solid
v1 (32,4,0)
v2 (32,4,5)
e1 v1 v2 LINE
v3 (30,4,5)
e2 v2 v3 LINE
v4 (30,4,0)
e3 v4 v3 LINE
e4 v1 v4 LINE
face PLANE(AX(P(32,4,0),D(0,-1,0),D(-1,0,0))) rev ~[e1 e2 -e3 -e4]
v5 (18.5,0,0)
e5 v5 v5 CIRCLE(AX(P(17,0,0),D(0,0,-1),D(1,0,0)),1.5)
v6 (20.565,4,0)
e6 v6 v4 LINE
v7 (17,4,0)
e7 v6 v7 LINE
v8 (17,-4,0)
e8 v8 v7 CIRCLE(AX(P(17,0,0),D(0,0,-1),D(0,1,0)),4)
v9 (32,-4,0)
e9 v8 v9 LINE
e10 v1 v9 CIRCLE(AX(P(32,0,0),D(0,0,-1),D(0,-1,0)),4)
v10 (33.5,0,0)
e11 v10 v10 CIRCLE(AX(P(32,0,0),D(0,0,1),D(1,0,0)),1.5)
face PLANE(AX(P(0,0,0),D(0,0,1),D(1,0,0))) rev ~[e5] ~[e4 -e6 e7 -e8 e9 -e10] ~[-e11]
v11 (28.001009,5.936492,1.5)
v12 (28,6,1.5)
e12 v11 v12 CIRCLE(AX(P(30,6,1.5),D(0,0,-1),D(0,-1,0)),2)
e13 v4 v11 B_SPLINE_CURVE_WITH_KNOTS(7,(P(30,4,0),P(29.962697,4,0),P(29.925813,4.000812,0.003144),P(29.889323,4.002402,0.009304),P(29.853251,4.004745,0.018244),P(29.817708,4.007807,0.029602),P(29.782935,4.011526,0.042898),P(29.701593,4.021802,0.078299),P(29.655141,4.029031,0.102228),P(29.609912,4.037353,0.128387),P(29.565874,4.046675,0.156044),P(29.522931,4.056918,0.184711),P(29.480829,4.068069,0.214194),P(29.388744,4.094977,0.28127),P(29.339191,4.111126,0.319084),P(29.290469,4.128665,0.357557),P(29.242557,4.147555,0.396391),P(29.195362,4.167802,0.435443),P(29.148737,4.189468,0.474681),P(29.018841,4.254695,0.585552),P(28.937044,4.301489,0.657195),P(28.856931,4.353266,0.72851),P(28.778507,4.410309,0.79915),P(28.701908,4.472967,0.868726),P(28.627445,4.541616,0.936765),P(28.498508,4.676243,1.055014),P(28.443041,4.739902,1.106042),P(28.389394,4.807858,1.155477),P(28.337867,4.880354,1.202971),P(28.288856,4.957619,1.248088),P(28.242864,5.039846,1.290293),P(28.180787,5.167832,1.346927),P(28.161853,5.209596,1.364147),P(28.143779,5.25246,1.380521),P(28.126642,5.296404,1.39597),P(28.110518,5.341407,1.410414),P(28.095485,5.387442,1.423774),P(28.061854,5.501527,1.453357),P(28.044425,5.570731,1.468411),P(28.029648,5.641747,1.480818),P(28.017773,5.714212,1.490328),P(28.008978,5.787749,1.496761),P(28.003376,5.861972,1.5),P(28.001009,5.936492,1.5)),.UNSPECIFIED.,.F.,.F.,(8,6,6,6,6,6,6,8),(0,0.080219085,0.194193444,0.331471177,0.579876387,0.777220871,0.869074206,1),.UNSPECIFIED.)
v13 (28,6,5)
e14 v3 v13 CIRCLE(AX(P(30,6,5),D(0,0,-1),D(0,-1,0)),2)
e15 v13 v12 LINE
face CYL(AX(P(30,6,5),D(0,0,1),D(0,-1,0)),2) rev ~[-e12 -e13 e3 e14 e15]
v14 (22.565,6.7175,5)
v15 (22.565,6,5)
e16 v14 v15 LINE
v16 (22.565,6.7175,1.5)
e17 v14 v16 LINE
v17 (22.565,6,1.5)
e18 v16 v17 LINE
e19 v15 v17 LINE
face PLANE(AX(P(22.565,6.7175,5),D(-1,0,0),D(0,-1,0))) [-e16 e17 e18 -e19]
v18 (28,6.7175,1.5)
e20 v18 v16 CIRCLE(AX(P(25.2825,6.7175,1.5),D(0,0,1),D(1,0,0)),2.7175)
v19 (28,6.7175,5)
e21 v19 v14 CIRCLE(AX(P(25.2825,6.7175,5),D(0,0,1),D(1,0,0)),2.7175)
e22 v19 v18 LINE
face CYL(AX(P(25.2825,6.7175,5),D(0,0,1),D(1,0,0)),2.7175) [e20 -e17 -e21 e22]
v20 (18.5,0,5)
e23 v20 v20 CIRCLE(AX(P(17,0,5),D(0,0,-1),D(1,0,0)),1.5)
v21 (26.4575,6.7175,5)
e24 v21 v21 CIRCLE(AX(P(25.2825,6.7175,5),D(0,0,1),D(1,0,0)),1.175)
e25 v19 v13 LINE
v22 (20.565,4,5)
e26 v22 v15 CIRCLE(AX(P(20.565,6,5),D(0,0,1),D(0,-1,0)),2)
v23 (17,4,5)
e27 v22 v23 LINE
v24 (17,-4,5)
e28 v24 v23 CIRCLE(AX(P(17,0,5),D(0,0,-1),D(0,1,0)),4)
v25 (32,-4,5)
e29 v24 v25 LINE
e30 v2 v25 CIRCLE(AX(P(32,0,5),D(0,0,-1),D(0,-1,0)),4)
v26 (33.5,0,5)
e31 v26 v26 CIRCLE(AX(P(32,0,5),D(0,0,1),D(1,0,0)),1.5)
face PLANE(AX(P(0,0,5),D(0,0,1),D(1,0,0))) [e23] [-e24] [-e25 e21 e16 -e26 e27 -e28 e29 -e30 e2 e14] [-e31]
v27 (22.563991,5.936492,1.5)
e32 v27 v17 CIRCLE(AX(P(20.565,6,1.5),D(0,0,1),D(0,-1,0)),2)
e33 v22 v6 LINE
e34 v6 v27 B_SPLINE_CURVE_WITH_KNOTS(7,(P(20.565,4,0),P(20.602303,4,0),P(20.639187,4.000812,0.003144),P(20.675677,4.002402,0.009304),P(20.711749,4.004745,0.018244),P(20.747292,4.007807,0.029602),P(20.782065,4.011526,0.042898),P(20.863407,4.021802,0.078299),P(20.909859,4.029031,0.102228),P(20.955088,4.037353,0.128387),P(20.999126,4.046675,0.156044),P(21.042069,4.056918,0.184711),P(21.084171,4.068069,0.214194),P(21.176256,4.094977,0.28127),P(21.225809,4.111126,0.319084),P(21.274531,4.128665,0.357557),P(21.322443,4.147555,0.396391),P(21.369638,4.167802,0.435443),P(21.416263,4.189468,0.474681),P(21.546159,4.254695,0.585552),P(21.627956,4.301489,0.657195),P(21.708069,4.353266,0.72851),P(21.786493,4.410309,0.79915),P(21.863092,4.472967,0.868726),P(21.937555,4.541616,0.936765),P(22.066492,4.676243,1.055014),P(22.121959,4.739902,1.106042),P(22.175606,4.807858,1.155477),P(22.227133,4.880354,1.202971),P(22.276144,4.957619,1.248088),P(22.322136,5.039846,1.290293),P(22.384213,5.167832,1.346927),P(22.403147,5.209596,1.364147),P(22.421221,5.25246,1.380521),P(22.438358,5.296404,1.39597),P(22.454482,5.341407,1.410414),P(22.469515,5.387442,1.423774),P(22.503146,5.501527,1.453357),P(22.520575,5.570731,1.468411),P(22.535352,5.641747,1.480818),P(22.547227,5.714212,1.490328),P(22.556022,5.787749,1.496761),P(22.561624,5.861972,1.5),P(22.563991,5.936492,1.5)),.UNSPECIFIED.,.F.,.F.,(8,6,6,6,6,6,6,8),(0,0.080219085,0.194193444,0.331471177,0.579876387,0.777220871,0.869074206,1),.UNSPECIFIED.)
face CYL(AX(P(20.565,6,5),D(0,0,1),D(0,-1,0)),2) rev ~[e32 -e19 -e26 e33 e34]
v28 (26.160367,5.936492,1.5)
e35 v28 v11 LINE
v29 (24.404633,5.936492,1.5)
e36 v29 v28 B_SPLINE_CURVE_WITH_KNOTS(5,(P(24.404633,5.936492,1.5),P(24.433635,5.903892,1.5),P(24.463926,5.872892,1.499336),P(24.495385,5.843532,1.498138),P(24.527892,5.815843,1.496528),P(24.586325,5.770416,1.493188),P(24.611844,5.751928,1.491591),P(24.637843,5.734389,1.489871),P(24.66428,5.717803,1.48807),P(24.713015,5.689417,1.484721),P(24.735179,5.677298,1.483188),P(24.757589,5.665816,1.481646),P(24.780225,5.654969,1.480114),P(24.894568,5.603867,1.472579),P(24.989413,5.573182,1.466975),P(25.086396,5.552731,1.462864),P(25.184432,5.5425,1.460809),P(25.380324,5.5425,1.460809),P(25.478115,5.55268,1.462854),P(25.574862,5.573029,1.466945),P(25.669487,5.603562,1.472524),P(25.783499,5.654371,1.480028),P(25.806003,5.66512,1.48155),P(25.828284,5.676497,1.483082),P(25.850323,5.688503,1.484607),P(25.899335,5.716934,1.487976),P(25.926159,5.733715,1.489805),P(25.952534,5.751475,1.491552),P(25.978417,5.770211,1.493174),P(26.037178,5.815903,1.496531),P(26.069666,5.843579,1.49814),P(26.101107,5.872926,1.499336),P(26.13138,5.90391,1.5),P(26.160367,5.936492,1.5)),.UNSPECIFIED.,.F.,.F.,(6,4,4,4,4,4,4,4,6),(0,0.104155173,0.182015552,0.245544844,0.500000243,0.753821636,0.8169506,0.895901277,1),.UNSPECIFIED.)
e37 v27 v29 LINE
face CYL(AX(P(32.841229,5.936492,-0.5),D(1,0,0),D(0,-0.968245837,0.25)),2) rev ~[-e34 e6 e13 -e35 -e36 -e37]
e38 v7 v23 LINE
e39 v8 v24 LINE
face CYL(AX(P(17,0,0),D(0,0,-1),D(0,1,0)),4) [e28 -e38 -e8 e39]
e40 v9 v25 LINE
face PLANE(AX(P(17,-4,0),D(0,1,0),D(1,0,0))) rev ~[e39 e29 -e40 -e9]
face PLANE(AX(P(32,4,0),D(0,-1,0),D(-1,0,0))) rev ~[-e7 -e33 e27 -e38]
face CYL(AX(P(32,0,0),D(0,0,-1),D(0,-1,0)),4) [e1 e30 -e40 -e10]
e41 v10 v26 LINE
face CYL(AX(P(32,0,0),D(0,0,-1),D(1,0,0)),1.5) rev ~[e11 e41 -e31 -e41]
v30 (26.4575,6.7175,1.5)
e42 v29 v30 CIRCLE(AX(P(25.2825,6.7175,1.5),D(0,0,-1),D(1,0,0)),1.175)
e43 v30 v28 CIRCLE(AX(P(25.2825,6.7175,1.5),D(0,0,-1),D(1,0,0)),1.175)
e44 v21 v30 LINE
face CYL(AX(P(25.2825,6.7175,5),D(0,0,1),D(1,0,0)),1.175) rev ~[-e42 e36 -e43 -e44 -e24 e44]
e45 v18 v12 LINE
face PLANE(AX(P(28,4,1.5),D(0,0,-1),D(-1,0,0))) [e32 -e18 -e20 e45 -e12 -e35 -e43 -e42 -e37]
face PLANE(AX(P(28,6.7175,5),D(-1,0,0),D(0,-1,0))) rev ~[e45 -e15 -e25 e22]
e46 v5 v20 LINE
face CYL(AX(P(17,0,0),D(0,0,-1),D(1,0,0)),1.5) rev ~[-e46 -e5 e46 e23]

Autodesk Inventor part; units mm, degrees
ref_plane "YZ Plane" through (0, 0, 0) normal (1, 0, 0) x (0, 1, 0)
ref_plane "XZ Plane" through (0, 0, 0) normal (0, 1, 0) x (-1, 0, 0)
ref_plane "XY Plane" through (0, 0, 0) normal (0, 0, 1) x (1, 0, 0)
sketch "Sketch1" plane through (0, 0, 0) normal (0, 0, 1) x (1, 0, 0)
  line L0 (40, 21) -> (41, 20) projected
  line L1 (40, 21) -> (32, 21) projected
  line L2 (32, 21) -> (32, 16) projected
  line L3 (32, 16) -> (35, 16) projected
  arc A0 (36, 15) -> (35, 16) centre (35, 15) ccw projected
  line L4 (36, 15) -> (36, 8) projected
  arc A1 (32, 4) -> (36, 8) centre (32, 8) ccw projected
  line L5 (32, 4) -> (15, 4) projected
  arc A2 (11.4706, 6.1176) -> (15, 4) centre (15, 8) ccw projected
  arc A3 (11.4706, 6.1176) -> (11.4706, -6.1176) centre (0, 0) ccw projected
  arc A4 (15, -4) -> (11.4706, -6.1176) centre (15, -8) ccw projected
  line L6 (15, -4) -> (32, -4) projected
  arc A5 (36, -8) -> (32, -4) centre (32, -8) ccw projected
  line L7 (36, -8) -> (36, -20.0526) projected
  line L8 (36, -20.0526) -> (39.035, -20.6277) projected
  line L9 (41, -19) -> (39.035, -20.6277) projected
  line L10 (41, -19) -> (41, 20) projected
  circle A6 centre (17, 0) radius 1.5 projected
  circle A7 centre (32, 0) radius 1.5 projected
  circle A8 centre (0, 0) radius 8.65 projected
  line L11 (32, 0) -> (17, 0)
  line L12 (32, 0) -> (17, 0) construction
  line L13 (32, 4) -> (17, 4)
  line L14 (17, -4) -> (32, -4)
  arc A9 (32, -4) -> (32, 4) centre (32, 0) ccw
  arc A10 (17, 4) -> (17, -4) centre (17, 0) ccw
  point P0 (0, 0)
  point P1 (24.5, 0)
  dimension "d0" = 7.5
  dimension "d1" = 8
extrude "Extrusion1" add sketch "Sketch1" along normal blind 3.5 contours L6 A10 L5 A9
thicken "Thicken1" operation add thickness 1.5 both sides no extend neighbours yes toward (0, 0, 1) faces at (22.4427, 2.899, 3.5)
sketch "Sketch2" plane through (17, 4, 5) normal (0, 0, 1) x (1, 0, 0)
  circle A0 centre (8.2825, 2.7175) radius 1.175 projected
  circle A1 centre (8.2825, 2.7175) radius 2.7175
  line L0 (15, 0) -> (0, 0) projected
  line L1 (11, 2.7175) -> (8.2825, 2.7175)
  line L2 (8.2825, 2.7175) -> (5.565, 2.7175)
  line L3 (5.565, 2.7175) -> (5.565, 0)
  line L4 (11, 2.7175) -> (11, 0)
  point P0 (-17, -4)
extrude "Extrusion2" add sketch "Sketch2" against normal blind 3.5 contours L1 A1 L2 A0 | A0 L2 A1 L1 | L4 L0 A1 | A1 L0 L3
fillet "Fillet1" radius 2 3 edges at (25.2825, 4, 1.5) (22.565, 4, 3.25) (28, 4, 3.25)
properties part number "switch_holder"
